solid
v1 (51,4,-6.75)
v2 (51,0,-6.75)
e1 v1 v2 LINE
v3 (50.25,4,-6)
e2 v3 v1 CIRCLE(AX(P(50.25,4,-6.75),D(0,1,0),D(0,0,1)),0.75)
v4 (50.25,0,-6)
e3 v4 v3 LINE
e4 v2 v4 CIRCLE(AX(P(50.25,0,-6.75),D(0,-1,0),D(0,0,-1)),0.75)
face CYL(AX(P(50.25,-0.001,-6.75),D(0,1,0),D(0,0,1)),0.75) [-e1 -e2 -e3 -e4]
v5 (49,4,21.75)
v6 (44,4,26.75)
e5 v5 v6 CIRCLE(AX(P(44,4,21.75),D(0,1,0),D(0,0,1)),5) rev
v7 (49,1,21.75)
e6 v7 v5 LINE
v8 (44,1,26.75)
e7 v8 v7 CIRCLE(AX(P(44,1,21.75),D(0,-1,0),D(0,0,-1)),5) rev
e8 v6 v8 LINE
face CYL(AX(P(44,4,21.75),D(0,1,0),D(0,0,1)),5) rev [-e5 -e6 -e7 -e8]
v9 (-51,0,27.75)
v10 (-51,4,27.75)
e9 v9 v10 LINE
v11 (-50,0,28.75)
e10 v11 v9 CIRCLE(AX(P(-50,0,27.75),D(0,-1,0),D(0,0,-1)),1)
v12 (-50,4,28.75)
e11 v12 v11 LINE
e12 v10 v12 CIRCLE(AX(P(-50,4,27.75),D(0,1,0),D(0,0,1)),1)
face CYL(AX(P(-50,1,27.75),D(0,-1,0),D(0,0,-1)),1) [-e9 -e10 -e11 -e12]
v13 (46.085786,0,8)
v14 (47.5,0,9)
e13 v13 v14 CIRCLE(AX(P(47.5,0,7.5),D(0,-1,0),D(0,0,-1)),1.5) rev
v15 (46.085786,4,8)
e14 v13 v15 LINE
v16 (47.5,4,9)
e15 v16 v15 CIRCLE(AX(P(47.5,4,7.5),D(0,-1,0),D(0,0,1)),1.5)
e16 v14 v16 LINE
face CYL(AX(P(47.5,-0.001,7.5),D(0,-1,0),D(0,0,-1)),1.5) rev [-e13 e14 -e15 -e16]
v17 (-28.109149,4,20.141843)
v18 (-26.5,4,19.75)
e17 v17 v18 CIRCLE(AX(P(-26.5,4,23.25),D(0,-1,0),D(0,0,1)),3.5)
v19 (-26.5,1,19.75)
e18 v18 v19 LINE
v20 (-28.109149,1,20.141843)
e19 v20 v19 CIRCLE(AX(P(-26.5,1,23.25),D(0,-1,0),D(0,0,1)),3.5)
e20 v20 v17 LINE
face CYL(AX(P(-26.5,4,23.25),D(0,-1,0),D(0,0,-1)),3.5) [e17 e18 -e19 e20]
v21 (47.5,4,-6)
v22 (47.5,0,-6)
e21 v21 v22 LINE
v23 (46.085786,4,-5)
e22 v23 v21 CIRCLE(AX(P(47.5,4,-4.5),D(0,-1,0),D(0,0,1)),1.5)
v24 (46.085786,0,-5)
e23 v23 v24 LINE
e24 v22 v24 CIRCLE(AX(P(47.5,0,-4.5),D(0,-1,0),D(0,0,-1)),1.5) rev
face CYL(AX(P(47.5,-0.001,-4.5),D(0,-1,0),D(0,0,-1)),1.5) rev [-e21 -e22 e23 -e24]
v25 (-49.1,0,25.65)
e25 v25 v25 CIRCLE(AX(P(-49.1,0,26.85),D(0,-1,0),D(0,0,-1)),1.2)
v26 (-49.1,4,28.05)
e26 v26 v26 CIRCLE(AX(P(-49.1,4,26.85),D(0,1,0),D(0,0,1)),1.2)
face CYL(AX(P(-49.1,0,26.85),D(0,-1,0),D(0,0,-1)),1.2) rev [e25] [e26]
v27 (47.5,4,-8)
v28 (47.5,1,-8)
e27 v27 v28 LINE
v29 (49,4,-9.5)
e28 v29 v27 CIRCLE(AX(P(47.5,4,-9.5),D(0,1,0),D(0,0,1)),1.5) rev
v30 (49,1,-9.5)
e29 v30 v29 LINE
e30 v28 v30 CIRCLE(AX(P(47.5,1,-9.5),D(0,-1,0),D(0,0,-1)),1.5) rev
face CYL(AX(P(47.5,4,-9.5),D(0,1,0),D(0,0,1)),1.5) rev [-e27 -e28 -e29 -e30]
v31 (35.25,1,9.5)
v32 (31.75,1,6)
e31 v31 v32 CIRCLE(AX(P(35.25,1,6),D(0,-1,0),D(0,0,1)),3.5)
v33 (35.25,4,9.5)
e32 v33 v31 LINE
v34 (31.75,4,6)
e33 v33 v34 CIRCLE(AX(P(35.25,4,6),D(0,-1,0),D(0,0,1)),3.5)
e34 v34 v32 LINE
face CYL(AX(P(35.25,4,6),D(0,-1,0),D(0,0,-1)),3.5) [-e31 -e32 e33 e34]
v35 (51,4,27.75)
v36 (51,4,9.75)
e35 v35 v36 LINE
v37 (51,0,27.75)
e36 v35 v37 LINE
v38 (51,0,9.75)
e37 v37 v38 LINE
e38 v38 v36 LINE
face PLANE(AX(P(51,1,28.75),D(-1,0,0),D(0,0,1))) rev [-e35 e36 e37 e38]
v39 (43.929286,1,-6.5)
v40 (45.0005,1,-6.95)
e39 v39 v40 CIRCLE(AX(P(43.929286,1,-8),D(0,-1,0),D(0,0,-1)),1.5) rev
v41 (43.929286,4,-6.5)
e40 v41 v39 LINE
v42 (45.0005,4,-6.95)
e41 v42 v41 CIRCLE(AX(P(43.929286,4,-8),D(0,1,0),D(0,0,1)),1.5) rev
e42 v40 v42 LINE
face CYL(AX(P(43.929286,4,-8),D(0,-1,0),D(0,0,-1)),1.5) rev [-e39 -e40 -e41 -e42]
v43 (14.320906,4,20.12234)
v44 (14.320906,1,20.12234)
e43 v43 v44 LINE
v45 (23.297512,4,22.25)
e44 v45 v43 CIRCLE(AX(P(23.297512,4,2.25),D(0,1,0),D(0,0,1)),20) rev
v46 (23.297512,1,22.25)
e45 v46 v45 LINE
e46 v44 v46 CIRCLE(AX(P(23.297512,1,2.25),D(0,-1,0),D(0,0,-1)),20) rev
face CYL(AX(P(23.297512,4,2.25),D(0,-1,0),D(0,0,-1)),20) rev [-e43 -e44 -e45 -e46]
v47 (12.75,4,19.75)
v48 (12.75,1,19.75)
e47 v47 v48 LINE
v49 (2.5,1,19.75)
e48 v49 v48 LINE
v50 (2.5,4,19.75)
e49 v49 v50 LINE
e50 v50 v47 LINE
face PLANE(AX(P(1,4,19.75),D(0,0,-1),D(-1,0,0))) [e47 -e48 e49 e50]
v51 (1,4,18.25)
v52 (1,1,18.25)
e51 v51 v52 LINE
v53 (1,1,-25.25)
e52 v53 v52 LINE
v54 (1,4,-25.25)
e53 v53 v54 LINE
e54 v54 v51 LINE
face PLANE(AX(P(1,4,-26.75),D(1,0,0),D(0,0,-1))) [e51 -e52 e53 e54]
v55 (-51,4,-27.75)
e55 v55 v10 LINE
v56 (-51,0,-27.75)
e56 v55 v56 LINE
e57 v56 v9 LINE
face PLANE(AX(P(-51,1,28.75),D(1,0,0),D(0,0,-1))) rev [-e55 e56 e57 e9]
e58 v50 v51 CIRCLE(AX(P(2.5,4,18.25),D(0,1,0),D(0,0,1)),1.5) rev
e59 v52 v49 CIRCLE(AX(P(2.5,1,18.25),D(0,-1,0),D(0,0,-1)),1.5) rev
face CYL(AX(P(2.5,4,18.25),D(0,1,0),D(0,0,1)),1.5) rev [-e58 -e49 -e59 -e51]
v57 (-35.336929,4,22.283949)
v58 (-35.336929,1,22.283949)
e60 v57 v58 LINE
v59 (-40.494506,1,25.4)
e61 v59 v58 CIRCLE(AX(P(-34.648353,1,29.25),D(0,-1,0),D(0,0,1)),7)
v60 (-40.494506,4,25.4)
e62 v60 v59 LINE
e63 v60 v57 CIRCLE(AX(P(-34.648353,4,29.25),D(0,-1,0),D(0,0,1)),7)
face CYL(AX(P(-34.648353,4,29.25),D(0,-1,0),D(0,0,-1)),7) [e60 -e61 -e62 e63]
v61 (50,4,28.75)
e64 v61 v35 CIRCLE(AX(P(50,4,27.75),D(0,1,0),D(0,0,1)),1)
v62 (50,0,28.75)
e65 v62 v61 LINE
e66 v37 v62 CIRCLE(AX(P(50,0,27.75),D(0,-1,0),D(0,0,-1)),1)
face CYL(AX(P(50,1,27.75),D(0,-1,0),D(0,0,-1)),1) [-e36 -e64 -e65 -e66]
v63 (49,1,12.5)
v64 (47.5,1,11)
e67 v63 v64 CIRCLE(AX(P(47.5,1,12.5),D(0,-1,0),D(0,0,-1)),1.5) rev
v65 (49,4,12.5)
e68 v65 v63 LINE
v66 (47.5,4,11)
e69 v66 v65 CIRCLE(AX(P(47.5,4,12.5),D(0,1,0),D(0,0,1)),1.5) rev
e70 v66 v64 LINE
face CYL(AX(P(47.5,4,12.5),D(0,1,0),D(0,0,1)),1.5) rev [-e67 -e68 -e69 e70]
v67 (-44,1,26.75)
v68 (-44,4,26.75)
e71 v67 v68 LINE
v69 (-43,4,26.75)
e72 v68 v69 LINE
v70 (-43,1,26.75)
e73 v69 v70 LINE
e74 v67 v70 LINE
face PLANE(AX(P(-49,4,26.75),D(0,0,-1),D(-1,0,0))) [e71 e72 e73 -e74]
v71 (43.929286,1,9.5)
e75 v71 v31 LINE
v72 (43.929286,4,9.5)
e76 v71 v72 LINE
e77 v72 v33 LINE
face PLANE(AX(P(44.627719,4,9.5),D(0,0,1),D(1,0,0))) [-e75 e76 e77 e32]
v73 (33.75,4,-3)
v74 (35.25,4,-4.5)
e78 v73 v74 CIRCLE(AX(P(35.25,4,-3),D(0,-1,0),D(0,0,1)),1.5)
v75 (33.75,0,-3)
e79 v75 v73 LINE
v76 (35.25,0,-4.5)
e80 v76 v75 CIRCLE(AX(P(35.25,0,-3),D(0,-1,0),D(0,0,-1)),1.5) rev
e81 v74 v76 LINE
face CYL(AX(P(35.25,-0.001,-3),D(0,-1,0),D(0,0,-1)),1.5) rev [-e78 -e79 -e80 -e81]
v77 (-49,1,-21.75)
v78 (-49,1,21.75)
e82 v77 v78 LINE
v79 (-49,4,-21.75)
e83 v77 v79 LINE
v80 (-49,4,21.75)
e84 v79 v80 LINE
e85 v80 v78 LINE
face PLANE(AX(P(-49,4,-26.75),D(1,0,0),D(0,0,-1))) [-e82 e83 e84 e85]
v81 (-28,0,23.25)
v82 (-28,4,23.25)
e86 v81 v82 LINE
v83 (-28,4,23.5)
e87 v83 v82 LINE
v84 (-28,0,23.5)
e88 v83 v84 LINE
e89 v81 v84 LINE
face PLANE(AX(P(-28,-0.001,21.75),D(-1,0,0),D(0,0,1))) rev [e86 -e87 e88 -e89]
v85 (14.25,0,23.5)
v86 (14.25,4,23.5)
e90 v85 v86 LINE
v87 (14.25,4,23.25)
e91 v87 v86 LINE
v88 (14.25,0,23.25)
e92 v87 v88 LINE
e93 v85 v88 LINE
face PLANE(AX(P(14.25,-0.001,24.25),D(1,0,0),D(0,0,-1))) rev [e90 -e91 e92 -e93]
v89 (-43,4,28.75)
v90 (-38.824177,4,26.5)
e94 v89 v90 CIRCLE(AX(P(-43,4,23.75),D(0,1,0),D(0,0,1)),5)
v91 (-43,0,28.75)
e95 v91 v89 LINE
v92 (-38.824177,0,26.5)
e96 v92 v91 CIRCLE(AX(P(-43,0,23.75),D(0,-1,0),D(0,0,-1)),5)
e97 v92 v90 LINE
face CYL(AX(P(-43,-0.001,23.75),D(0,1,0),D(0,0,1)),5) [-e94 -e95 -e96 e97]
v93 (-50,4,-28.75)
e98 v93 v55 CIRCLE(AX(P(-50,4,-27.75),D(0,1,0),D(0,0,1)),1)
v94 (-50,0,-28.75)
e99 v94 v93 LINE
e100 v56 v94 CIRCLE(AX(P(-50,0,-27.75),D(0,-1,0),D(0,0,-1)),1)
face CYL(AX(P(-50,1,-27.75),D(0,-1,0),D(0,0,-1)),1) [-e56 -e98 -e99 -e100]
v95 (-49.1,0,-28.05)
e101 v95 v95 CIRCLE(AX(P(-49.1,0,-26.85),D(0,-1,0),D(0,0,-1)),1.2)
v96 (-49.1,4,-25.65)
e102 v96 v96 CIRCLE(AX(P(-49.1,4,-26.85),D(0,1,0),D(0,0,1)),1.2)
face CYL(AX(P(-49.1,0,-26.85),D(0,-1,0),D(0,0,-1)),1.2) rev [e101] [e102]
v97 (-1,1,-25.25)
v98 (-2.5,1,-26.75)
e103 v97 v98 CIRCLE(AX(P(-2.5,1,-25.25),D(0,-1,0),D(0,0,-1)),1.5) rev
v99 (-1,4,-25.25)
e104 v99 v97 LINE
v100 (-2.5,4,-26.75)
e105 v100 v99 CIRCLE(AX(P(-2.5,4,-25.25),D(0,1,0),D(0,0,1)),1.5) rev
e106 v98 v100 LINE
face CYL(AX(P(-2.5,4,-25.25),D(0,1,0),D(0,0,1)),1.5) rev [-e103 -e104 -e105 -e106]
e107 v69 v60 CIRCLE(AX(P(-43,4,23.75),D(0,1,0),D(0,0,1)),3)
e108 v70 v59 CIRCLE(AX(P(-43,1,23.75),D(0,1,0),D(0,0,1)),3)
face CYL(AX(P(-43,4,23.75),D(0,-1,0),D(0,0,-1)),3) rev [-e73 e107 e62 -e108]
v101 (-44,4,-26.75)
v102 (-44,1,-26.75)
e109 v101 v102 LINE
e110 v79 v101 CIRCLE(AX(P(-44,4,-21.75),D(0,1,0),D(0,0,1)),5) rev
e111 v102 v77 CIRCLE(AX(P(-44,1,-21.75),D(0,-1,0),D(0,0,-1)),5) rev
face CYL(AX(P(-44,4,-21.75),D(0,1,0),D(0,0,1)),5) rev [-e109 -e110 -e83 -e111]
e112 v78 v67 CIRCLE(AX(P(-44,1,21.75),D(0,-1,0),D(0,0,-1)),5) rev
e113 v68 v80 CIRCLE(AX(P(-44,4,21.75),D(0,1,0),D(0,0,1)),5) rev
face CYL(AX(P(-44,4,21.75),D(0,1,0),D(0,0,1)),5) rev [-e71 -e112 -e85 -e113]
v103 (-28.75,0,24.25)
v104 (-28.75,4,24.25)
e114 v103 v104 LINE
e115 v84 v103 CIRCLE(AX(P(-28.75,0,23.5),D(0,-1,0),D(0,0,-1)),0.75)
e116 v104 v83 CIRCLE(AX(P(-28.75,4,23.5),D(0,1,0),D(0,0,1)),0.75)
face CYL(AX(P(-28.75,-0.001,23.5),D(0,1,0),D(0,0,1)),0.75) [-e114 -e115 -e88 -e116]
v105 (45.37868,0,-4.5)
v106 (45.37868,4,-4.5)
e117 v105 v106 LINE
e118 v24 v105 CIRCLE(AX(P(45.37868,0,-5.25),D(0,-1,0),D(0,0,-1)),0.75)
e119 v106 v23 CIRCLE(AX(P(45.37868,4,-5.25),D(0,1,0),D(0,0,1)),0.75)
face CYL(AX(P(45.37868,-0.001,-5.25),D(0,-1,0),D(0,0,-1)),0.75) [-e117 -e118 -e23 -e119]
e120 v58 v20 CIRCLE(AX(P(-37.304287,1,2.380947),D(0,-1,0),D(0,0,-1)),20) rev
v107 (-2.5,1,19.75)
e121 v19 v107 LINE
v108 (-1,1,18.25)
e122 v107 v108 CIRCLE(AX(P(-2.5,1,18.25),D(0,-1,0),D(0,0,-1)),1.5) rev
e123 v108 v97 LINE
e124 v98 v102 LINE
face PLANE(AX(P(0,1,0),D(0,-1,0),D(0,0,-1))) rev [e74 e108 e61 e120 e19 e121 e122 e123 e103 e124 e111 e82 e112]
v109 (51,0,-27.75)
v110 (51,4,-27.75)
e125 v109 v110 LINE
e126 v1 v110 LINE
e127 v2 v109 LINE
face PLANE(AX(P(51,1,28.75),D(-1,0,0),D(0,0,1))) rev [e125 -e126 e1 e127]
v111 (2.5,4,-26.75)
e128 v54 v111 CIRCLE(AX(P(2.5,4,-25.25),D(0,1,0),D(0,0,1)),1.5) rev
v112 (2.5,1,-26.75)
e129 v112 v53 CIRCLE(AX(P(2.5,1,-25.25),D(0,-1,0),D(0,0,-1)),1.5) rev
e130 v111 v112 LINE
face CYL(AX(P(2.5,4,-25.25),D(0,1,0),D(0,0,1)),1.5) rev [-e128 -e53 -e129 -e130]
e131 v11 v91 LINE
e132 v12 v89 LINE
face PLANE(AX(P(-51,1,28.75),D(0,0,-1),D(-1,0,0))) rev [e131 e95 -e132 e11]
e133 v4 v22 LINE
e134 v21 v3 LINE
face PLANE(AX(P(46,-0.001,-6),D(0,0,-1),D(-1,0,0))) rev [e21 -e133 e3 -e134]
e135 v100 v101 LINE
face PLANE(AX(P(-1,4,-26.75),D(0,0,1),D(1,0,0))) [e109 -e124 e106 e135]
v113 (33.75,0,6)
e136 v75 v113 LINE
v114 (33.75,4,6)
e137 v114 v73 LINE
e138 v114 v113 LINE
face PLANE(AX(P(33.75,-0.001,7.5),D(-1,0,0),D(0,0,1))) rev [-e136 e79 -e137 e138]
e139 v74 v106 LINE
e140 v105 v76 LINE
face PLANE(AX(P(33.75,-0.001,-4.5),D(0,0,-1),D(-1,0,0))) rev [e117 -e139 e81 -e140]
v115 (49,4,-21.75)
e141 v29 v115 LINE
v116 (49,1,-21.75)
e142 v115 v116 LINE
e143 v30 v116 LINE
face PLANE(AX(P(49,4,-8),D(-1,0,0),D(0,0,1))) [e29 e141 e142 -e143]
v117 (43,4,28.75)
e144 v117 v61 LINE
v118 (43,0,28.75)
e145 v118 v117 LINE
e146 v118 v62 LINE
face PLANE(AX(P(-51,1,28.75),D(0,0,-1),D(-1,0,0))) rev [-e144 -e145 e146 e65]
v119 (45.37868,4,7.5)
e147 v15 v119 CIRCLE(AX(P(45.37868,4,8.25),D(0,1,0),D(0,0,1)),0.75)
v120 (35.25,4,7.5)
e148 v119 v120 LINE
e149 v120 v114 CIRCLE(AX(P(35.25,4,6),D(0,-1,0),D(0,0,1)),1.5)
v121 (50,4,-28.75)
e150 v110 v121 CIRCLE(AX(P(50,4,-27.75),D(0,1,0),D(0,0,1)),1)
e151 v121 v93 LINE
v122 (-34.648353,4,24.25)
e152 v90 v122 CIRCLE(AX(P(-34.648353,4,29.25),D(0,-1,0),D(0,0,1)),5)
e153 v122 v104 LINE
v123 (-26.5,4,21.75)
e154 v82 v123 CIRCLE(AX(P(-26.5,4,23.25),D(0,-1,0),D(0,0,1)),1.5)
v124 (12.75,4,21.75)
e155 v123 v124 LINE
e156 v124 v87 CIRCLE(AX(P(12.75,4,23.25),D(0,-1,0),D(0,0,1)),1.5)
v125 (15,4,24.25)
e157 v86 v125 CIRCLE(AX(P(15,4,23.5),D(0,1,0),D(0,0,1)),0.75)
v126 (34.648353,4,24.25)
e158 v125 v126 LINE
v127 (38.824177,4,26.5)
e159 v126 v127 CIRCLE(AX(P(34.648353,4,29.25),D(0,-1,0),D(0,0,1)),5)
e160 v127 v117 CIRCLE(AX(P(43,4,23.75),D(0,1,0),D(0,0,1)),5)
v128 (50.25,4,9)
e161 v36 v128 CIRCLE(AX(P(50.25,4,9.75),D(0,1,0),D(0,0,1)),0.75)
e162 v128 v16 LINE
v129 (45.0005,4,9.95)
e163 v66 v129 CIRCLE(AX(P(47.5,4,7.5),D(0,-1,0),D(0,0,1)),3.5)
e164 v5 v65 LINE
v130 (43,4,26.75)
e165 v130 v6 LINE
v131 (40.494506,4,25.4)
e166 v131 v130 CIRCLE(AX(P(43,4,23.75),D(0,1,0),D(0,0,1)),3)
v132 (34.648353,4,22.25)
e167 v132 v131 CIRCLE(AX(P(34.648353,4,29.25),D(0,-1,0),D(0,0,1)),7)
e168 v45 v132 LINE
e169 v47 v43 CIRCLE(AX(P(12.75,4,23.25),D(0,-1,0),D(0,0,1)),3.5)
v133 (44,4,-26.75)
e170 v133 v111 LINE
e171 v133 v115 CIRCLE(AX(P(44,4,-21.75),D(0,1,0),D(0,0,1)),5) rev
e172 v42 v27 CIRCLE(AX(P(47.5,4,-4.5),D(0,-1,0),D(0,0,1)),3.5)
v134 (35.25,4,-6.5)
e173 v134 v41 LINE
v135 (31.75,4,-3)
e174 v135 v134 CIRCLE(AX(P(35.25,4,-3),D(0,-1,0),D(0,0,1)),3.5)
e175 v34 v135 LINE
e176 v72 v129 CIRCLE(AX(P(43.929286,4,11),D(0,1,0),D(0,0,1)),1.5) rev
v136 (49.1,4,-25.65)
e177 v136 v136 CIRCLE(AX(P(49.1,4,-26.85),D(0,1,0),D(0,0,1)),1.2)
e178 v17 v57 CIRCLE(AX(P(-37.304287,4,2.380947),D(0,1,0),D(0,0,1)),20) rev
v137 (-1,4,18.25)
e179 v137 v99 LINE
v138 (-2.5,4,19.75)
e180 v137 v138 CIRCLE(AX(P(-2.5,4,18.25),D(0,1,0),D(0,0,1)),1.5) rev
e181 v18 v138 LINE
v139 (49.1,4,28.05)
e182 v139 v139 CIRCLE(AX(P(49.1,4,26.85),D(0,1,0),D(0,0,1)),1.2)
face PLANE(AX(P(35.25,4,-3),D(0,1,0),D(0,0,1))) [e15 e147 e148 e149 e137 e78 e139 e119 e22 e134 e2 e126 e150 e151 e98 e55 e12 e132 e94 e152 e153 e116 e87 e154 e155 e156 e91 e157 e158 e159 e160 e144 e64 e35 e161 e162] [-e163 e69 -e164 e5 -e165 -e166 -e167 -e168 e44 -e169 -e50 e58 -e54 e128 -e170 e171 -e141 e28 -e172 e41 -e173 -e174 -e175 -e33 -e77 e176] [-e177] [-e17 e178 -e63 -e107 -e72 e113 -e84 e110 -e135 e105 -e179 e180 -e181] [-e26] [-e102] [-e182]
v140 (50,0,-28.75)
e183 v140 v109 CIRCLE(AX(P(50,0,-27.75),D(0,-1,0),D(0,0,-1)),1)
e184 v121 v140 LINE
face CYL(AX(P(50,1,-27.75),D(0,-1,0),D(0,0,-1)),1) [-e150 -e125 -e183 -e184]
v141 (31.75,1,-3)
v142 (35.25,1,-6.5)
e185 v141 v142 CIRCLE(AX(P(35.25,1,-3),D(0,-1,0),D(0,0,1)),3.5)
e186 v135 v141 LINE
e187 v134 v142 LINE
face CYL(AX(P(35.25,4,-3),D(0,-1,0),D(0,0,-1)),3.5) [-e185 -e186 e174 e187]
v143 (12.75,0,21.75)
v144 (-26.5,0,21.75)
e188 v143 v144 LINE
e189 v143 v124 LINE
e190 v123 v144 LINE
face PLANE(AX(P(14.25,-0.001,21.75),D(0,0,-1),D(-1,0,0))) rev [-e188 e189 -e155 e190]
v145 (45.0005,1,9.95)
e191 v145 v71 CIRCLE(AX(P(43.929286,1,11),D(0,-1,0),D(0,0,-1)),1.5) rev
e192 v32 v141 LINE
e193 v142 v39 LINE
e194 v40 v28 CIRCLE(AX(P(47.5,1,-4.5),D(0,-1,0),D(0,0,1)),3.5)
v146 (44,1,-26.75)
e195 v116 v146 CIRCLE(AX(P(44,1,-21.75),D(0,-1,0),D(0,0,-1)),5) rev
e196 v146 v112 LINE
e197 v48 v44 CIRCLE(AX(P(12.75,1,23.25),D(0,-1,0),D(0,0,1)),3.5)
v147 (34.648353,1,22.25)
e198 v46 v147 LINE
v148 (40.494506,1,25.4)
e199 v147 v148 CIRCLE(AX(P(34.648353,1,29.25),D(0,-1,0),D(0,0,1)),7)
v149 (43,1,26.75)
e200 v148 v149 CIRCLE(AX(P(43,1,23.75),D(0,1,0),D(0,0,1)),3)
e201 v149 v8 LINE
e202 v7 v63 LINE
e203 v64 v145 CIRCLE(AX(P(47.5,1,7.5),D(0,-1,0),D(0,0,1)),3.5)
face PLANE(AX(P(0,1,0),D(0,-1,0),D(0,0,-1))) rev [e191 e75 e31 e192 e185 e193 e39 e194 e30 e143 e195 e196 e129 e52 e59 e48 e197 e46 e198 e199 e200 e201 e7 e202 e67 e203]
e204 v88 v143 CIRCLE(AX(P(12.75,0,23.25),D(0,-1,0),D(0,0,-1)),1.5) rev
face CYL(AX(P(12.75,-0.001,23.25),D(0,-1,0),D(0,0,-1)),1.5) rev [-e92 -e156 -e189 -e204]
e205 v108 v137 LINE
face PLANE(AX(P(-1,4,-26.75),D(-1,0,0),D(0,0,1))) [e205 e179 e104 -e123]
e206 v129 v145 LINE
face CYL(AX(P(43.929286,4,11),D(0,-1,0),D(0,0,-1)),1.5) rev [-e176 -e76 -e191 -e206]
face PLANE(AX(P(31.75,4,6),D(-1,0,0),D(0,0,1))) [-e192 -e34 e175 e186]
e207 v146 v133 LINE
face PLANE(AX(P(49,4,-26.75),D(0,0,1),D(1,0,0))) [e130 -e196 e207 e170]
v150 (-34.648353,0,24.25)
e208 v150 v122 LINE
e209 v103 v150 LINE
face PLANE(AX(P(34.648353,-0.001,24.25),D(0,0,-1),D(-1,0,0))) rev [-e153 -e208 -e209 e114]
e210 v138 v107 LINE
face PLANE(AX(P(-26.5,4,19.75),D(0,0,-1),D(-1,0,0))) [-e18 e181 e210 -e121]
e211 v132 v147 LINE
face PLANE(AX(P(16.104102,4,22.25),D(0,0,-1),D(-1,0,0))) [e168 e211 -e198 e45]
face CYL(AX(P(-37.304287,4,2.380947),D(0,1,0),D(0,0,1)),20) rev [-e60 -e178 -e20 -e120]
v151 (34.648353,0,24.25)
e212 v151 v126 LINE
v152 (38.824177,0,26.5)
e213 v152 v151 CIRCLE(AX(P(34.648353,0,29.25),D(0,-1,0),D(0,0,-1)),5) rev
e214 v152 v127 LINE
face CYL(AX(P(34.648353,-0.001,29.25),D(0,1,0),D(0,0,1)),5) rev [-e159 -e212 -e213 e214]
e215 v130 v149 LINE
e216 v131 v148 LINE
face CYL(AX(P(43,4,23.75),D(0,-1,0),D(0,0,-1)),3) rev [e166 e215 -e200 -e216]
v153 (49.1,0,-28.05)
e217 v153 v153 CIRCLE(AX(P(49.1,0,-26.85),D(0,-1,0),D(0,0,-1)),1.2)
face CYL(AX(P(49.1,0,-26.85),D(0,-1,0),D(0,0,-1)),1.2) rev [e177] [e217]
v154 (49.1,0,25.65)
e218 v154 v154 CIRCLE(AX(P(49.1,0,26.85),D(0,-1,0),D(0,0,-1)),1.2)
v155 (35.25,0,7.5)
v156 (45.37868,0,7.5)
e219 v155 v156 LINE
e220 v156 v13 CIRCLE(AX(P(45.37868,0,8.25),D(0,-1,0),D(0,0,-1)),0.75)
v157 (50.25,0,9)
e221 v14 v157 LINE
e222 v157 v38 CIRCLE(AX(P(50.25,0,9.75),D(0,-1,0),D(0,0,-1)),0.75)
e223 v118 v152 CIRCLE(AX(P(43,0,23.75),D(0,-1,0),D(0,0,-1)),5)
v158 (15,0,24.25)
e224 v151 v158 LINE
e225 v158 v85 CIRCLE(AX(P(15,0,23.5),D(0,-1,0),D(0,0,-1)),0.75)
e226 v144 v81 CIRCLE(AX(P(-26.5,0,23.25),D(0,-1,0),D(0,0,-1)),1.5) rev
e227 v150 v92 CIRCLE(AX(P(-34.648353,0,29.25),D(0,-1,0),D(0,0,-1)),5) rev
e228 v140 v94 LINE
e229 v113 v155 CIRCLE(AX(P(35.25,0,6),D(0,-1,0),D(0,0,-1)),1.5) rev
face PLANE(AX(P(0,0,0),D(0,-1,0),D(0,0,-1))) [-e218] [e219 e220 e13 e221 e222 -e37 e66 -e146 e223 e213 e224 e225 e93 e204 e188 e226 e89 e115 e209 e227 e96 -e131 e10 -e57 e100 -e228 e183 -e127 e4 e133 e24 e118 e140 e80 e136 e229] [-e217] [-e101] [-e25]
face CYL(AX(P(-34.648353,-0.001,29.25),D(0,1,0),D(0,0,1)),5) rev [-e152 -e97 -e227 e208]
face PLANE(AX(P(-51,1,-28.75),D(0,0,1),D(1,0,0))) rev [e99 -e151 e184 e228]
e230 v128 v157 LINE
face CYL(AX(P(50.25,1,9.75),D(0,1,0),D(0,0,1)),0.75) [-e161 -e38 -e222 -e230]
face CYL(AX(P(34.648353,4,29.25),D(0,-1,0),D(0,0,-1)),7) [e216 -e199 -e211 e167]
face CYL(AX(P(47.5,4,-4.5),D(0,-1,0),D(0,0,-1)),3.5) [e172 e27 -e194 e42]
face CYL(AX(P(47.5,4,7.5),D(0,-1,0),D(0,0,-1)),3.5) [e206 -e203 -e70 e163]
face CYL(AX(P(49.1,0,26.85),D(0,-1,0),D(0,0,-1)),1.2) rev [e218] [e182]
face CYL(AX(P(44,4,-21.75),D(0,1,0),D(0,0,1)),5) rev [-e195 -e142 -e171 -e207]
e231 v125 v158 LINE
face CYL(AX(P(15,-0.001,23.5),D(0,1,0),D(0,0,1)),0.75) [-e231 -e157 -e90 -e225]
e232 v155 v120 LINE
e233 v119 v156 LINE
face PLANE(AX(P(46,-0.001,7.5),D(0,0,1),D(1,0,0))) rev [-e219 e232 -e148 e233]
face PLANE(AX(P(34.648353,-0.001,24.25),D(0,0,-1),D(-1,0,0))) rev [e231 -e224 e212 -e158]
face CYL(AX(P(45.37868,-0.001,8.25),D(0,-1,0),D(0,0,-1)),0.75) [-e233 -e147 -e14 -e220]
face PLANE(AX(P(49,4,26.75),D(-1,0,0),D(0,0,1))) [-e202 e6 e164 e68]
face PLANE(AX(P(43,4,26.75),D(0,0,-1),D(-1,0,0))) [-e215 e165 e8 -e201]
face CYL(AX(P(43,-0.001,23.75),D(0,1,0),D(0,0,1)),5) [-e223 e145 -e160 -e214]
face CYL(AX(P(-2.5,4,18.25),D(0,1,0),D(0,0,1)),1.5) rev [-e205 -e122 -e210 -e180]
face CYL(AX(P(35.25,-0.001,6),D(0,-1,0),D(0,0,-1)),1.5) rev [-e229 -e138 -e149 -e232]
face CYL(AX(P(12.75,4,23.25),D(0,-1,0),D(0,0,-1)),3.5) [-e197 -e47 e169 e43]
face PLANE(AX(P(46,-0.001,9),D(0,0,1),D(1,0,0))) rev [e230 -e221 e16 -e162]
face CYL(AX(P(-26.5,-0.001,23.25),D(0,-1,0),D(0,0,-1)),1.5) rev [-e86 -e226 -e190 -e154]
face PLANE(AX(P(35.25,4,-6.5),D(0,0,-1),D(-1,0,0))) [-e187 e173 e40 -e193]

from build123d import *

# Parameters (mm, degrees)
SKIZZE1_W                       = 102
SKIZZE1_H                       = 57.5
AUFSATZ_LINEAR_AUSTRAGEN1_DEPTH = 1
VERRUNDUNG1_R                   = 1
SCHNITT_LINEAR_AUSTRAGEN1_REACH = 60.554
SCHNITT_LINEAR_AUSTRAGEN2_REACH = 60.554
SKIZZE6_W                       = 42.25
SKIZZE6_H                       = 2.5
VERRUNDUNG2_R                   = 1.5
VERRUNDUNG3_R                   = 0.75
AUFSATZ_LINEAR_START            = 3
AUFSATZ_LINEAR_AUSTRAGEN2_DEPTH = 3
VERRUNDUNG4_R                   = 5
DURCHGANGSLOCH_F_R_M21_D        = 2.4
VERRUNDUNG5_R                   = 1.5
VERRUNDUNG6_R                   = 20


with BuildPart() as part:
    # Skizze1 → Aufsatz-Linear austragen1 (new body)
    with BuildSketch(Plane(origin=(0, 0, 0), x_dir=(1, 0, 0), z_dir=(0, 1, 0))):
        Rectangle(SKIZZE1_W, SKIZZE1_H)
    extrude(amount=AUFSATZ_LINEAR_AUSTRAGEN1_DEPTH)

    # Verrundung1
    verrundung1_edges = [part.edges().sort_by_distance(p)[0] for p in [
        (51, 0.5, 28.75),
        (-51, 0.5, 28.75),
        (-51, 0.5, -28.75),
        (51, 0.5, -28.75),
    ]]
    fillet(verrundung1_edges, radius=VERRUNDUNG1_R)

    # Skizze5 → Schnitt-Linear austragen1 (cut, up to next)
    with BuildSketch(Plane(origin=(0, 1, 0), x_dir=(1, 0, 0), z_dir=(0, 1, 0)), mode=Mode.PRIVATE) as schnitt_linear_austragen1_sk1:
        with BuildLine():
            Line((-43, -28.75), (43, -28.75))
            ThreePointArc((43, -28.75), (40.628291755, -28.151704215), (38.824176728, -26.5))
            ThreePointArc((38.824176728, -26.5), (37.020061701, -24.848295785), (34.648353456, -24.25))
            Line((34.648353456, -24.25), (-34.648353456, -24.25))
            ThreePointArc((-34.648353456, -24.25), (-37.020061701, -24.848295785), (-38.824176728, -26.5))
            ThreePointArc((-38.824176728, -26.5), (-40.628291755, -28.151704215), (-43, -28.75))
        make_face()
    schnitt_linear_austragen1_tool1 = extrude(schnitt_linear_austragen1_sk1.sketch, amount=-SCHNITT_LINEAR_AUSTRAGEN1_REACH, mode=Mode.PRIVATE) & part.part
    add(schnitt_linear_austragen1_tool1.solids().sort_by_distance((0, 1, 26.551349))[0], mode=Mode.SUBTRACT)

    # Skizze6 → Schnitt-Linear austragen2 (cut, up to next)
    with BuildSketch(Plane(origin=(0, 1, 0), x_dir=(1, 0, 0), z_dir=(0, 1, 0)), mode=Mode.PRIVATE) as schnitt_linear_austragen2_sk1:
        with Locations((-6.875, -23)):
            Rectangle(SKIZZE6_W, SKIZZE6_H)
    schnitt_linear_austragen2_tool1 = extrude(schnitt_linear_austragen2_sk1.sketch, amount=-SCHNITT_LINEAR_AUSTRAGEN2_REACH, mode=Mode.PRIVATE) & part.part
    # Skizze6 → Schnitt-Linear austragen2 (cut, up to next)
    with BuildSketch(Plane(origin=(0, 1, 0), x_dir=(1, 0, 0), z_dir=(0, 1, 0)), mode=Mode.PRIVATE) as schnitt_linear_austragen2_sk2:
        Polygon((33.75, 4.5), (46, 4.5), (46, 6), (51, 6), (51, 4.5), (51, -7.5), (51, -9), (46, -9), (46, -7.5), (33.75, -7.5), align=None)
    schnitt_linear_austragen2_tool2 = extrude(schnitt_linear_austragen2_sk2.sketch, amount=-SCHNITT_LINEAR_AUSTRAGEN2_REACH, mode=Mode.PRIVATE) & part.part
    add(schnitt_linear_austragen2_tool1.solids().sort_by_distance((-6.875, 1, 23))[0], mode=Mode.SUBTRACT)
    add(schnitt_linear_austragen2_tool2.solids().sort_by_distance((42.788851, 1, 1.5))[0], mode=Mode.SUBTRACT)

    # Verrundung2
    verrundung2_edges = [part.edges().sort_by_distance(p)[0] for p in [
        (33.75, 0.5, -4.5),
        (33.75, 0.5, 7.5),
        (14.25, 0.5, 21.75),
        (-28, 0.5, 21.75),
        (46, 0.5, -6),
        (46, 0.5, 9),
    ]]
    fillet(verrundung2_edges, radius=VERRUNDUNG2_R - 0.0001)  # a hair under: the kernel refuses the full size

    # Verrundung3
    verrundung3_edges = [part.edges().sort_by_distance(p)[0] for p in [
        (14.25, 0.5, 24.25),
        (-28, 0.5, 24.25),
        (46, 0.5, -4.5),
        (51, 0.5, -6),
        (51, 0.5, 9),
        (46, 0.5, 7.5),
    ]]
    fillet(verrundung3_edges, radius=VERRUNDUNG3_R)

    # Skizze8 → Aufsatz-Linear austragen2 (add)
    with BuildSketch(Plane(origin=(0, 1, 0), x_dir=(1, 0, 0), z_dir=(0, 1, 0)).offset(AUFSATZ_LINEAR_START)):
        with BuildLine():
            Line((35.25, 4.5), (45.378679656, 4.5))
            ThreePointArc((45.378679656, 4.5), (45.811692358, 4.637627564), (46.085786438, 5))
            ThreePointArc((46.085786438, 5), (46.633974596, 5.724744871), (47.5, 6))
            Line((47.5, 6), (50.25, 6))
            ThreePointArc((50.25, 6), (50.780330086, 6.219669914), (51, 6.75))
            Line((51, 6.75), (51, 27.75))
            ThreePointArc((51, 27.75), (50.707106781, 28.457106781), (50, 28.75))
            Line((50, 28.75), (-50, 28.75))
            ThreePointArc((-50, 28.75), (-50.707106781, 28.457106781), (-51, 27.75))
            Line((-51, 27.75), (-51, -27.75))
            ThreePointArc((-51, -27.75), (-50.707106781, -28.457106781), (-50, -28.75))
            Line((-50, -28.75), (-43, -28.75))
            ThreePointArc((-43, -28.75), (-40.628291755, -28.151704215), (-38.824176728, -26.5))
            ThreePointArc((-38.824176728, -26.5), (-37.020061701, -24.848295785), (-34.648353456, -24.25))
            Line((-34.648353456, -24.25), (-28.75, -24.25))
            ThreePointArc((-28.75, -24.25), (-28.219669914, -24.030330086), (-28, -23.5))
            Line((-28, -23.5), (-28, -23.25))
            ThreePointArc((-28, -23.25), (-27.560660172, -22.189339828), (-26.5, -21.75))
            Line((-26.5, -21.75), (12.75, -21.75))
            ThreePointArc((12.75, -21.75), (13.810660172, -22.189339828), (14.25, -23.25))
            Line((14.25, -23.25), (14.25, -23.5))
            ThreePointArc((14.25, -23.5), (14.469669914, -24.030330086), (15, -24.25))
            Line((15, -24.25), (34.648353456, -24.25))
            ThreePointArc((34.648353456, -24.25), (37.020061701, -24.848295785), (38.824176728, -26.5))
            ThreePointArc((38.824176728, -26.5), (40.628291755, -28.151704215), (43, -28.75))
            Line((43, -28.75), (50, -28.75))
            ThreePointArc((50, -28.75), (50.707106781, -28.457106781), (51, -27.75))
            Line((51, -27.75), (51, -9.75))
            ThreePointArc((51, -9.75), (50.780330086, -9.219669914), (50.25, -9))
            Line((50.25, -9), (47.5, -9))
            ThreePointArc((47.5, -9), (46.633974596, -8.724744871), (46.085786438, -8))
            ThreePointArc((46.085786438, -8), (45.811692358, -7.637627564), (45.378679656, -7.5))
            Line((45.378679656, -7.5), (35.25, -7.5))
            ThreePointArc((35.25, -7.5), (34.189339828, -7.060660172), (33.75, -6))
            Line((33.75, -6), (33.75, 3))
            ThreePointArc((33.75, 3), (34.189339828, 4.060660172), (35.25, 4.5))
        make_face()
        with BuildLine():
            Line((35.25, 6.5), (44.627718677, 6.5))
            ThreePointArc((44.627718677, 6.5), (45.879814825, 7.602418411), (47.5, 8))
            Line((47.5, 8), (49, 8))
            Line((49, 8), (49, 26.75))
            Line((49, 26.75), (1, 26.75))
            Line((1, 26.75), (1, -19.75))
            Line((1, -19.75), (12.75, -19.75))
            ThreePointArc((12.75, -19.75), (14.841650066, -20.44375696), (16.104101966, -22.25))
            Line((16.104101966, -22.25), (34.648353456, -22.25))
            ThreePointArc((34.648353456, -22.25), (37.968744999, -23.087614098), (40.494506037, -25.4))
            ThreePointArc((40.494506037, -25.4), (41.576975053, -26.391022529), (43, -26.75))
            Line((43, -26.75), (49, -26.75))
            Line((49, -26.75), (49, -11))
            Line((49, -11), (47.5, -11))
            ThreePointArc((47.5, -11), (45.879814825, -10.602418411), (44.627718677, -9.5))
            Line((44.627718677, -9.5), (35.25, -9.5))
            ThreePointArc((35.25, -9.5), (32.775126266, -8.474873734), (31.75, -6))
            Line((31.75, -6), (31.75, 3))
            ThreePointArc((31.75, 3), (32.775126266, 5.474873734), (35.25, 6.5))
        make_face(mode=Mode.SUBTRACT)
        with BuildLine():
            Line((-49, 26.75), (-49, -26.75))
            Line((-49, -26.75), (-43, -26.75))
            ThreePointArc((-43, -26.75), (-41.576975053, -26.391022529), (-40.494506037, -25.4))
            ThreePointArc((-40.494506037, -25.4), (-37.968744999, -23.087614098), (-34.648353456, -22.25))
            Line((-34.648353456, -22.25), (-29.854101966, -22.25))
            ThreePointArc((-29.854101966, -22.25), (-28.591650066, -20.44375696), (-26.5, -19.75))
            Line((-26.5, -19.75), (-1, -19.75))
            Line((-1, -19.75), (-1, 26.75))
            Line((-1, 26.75), (-49, 26.75))
        make_face(mode=Mode.SUBTRACT)
    extrude(amount=-AUFSATZ_LINEAR_AUSTRAGEN2_DEPTH)

    # Verrundung4
    verrundung4_edges = [part.edges().sort_by_distance(p)[0] for p in [
        (49, 2.5, -26.75),
        (49, 2.5, 26.75),
        (-49, 2.5, 26.75),
        (-49, 2.5, -26.75),
    ]]
    fillet(verrundung4_edges, radius=VERRUNDUNG4_R)

    # Durchgangsloch für M21 (through all)
    with Locations(Plane(origin=(0, 0, 0), x_dir=(-1, 0, 0), z_dir=(0, -1, 0))):
        with Locations((-49.1, -26.85), (49.1, 26.85), (49.1, -26.85), (-49.1, 26.85)):
            Hole(DURCHGANGSLOCH_F_R_M21_D / 2)

    # Verrundung5
    verrundung5_edges = [part.edges().sort_by_distance(p)[0] for p in [
        (-1, 2.5, -26.75),
        (-1, 2.5, 19.75),
        (1, 2.5, 19.75),
        (1, 2.5, -26.75),
        (49, 2.5, -8),
        (44.627718677, 2.5, -6.5),
        (44.627718677, 2.5, 9.5),
        (49, 2.5, 11),
    ]]
    fillet(verrundung5_edges, radius=VERRUNDUNG5_R - 0.0001)  # a hair under: the kernel refuses the full size

    # Verrundung6
    verrundung6_edges = [part.edges().sort_by_distance(p)[0] for p in [
        (16.104101966, 2.5, 22.25),
        (-29.854101966, 2.5, 22.25),
    ]]
    fillet(verrundung6_edges, radius=VERRUNDUNG6_R)


solid = part.part
